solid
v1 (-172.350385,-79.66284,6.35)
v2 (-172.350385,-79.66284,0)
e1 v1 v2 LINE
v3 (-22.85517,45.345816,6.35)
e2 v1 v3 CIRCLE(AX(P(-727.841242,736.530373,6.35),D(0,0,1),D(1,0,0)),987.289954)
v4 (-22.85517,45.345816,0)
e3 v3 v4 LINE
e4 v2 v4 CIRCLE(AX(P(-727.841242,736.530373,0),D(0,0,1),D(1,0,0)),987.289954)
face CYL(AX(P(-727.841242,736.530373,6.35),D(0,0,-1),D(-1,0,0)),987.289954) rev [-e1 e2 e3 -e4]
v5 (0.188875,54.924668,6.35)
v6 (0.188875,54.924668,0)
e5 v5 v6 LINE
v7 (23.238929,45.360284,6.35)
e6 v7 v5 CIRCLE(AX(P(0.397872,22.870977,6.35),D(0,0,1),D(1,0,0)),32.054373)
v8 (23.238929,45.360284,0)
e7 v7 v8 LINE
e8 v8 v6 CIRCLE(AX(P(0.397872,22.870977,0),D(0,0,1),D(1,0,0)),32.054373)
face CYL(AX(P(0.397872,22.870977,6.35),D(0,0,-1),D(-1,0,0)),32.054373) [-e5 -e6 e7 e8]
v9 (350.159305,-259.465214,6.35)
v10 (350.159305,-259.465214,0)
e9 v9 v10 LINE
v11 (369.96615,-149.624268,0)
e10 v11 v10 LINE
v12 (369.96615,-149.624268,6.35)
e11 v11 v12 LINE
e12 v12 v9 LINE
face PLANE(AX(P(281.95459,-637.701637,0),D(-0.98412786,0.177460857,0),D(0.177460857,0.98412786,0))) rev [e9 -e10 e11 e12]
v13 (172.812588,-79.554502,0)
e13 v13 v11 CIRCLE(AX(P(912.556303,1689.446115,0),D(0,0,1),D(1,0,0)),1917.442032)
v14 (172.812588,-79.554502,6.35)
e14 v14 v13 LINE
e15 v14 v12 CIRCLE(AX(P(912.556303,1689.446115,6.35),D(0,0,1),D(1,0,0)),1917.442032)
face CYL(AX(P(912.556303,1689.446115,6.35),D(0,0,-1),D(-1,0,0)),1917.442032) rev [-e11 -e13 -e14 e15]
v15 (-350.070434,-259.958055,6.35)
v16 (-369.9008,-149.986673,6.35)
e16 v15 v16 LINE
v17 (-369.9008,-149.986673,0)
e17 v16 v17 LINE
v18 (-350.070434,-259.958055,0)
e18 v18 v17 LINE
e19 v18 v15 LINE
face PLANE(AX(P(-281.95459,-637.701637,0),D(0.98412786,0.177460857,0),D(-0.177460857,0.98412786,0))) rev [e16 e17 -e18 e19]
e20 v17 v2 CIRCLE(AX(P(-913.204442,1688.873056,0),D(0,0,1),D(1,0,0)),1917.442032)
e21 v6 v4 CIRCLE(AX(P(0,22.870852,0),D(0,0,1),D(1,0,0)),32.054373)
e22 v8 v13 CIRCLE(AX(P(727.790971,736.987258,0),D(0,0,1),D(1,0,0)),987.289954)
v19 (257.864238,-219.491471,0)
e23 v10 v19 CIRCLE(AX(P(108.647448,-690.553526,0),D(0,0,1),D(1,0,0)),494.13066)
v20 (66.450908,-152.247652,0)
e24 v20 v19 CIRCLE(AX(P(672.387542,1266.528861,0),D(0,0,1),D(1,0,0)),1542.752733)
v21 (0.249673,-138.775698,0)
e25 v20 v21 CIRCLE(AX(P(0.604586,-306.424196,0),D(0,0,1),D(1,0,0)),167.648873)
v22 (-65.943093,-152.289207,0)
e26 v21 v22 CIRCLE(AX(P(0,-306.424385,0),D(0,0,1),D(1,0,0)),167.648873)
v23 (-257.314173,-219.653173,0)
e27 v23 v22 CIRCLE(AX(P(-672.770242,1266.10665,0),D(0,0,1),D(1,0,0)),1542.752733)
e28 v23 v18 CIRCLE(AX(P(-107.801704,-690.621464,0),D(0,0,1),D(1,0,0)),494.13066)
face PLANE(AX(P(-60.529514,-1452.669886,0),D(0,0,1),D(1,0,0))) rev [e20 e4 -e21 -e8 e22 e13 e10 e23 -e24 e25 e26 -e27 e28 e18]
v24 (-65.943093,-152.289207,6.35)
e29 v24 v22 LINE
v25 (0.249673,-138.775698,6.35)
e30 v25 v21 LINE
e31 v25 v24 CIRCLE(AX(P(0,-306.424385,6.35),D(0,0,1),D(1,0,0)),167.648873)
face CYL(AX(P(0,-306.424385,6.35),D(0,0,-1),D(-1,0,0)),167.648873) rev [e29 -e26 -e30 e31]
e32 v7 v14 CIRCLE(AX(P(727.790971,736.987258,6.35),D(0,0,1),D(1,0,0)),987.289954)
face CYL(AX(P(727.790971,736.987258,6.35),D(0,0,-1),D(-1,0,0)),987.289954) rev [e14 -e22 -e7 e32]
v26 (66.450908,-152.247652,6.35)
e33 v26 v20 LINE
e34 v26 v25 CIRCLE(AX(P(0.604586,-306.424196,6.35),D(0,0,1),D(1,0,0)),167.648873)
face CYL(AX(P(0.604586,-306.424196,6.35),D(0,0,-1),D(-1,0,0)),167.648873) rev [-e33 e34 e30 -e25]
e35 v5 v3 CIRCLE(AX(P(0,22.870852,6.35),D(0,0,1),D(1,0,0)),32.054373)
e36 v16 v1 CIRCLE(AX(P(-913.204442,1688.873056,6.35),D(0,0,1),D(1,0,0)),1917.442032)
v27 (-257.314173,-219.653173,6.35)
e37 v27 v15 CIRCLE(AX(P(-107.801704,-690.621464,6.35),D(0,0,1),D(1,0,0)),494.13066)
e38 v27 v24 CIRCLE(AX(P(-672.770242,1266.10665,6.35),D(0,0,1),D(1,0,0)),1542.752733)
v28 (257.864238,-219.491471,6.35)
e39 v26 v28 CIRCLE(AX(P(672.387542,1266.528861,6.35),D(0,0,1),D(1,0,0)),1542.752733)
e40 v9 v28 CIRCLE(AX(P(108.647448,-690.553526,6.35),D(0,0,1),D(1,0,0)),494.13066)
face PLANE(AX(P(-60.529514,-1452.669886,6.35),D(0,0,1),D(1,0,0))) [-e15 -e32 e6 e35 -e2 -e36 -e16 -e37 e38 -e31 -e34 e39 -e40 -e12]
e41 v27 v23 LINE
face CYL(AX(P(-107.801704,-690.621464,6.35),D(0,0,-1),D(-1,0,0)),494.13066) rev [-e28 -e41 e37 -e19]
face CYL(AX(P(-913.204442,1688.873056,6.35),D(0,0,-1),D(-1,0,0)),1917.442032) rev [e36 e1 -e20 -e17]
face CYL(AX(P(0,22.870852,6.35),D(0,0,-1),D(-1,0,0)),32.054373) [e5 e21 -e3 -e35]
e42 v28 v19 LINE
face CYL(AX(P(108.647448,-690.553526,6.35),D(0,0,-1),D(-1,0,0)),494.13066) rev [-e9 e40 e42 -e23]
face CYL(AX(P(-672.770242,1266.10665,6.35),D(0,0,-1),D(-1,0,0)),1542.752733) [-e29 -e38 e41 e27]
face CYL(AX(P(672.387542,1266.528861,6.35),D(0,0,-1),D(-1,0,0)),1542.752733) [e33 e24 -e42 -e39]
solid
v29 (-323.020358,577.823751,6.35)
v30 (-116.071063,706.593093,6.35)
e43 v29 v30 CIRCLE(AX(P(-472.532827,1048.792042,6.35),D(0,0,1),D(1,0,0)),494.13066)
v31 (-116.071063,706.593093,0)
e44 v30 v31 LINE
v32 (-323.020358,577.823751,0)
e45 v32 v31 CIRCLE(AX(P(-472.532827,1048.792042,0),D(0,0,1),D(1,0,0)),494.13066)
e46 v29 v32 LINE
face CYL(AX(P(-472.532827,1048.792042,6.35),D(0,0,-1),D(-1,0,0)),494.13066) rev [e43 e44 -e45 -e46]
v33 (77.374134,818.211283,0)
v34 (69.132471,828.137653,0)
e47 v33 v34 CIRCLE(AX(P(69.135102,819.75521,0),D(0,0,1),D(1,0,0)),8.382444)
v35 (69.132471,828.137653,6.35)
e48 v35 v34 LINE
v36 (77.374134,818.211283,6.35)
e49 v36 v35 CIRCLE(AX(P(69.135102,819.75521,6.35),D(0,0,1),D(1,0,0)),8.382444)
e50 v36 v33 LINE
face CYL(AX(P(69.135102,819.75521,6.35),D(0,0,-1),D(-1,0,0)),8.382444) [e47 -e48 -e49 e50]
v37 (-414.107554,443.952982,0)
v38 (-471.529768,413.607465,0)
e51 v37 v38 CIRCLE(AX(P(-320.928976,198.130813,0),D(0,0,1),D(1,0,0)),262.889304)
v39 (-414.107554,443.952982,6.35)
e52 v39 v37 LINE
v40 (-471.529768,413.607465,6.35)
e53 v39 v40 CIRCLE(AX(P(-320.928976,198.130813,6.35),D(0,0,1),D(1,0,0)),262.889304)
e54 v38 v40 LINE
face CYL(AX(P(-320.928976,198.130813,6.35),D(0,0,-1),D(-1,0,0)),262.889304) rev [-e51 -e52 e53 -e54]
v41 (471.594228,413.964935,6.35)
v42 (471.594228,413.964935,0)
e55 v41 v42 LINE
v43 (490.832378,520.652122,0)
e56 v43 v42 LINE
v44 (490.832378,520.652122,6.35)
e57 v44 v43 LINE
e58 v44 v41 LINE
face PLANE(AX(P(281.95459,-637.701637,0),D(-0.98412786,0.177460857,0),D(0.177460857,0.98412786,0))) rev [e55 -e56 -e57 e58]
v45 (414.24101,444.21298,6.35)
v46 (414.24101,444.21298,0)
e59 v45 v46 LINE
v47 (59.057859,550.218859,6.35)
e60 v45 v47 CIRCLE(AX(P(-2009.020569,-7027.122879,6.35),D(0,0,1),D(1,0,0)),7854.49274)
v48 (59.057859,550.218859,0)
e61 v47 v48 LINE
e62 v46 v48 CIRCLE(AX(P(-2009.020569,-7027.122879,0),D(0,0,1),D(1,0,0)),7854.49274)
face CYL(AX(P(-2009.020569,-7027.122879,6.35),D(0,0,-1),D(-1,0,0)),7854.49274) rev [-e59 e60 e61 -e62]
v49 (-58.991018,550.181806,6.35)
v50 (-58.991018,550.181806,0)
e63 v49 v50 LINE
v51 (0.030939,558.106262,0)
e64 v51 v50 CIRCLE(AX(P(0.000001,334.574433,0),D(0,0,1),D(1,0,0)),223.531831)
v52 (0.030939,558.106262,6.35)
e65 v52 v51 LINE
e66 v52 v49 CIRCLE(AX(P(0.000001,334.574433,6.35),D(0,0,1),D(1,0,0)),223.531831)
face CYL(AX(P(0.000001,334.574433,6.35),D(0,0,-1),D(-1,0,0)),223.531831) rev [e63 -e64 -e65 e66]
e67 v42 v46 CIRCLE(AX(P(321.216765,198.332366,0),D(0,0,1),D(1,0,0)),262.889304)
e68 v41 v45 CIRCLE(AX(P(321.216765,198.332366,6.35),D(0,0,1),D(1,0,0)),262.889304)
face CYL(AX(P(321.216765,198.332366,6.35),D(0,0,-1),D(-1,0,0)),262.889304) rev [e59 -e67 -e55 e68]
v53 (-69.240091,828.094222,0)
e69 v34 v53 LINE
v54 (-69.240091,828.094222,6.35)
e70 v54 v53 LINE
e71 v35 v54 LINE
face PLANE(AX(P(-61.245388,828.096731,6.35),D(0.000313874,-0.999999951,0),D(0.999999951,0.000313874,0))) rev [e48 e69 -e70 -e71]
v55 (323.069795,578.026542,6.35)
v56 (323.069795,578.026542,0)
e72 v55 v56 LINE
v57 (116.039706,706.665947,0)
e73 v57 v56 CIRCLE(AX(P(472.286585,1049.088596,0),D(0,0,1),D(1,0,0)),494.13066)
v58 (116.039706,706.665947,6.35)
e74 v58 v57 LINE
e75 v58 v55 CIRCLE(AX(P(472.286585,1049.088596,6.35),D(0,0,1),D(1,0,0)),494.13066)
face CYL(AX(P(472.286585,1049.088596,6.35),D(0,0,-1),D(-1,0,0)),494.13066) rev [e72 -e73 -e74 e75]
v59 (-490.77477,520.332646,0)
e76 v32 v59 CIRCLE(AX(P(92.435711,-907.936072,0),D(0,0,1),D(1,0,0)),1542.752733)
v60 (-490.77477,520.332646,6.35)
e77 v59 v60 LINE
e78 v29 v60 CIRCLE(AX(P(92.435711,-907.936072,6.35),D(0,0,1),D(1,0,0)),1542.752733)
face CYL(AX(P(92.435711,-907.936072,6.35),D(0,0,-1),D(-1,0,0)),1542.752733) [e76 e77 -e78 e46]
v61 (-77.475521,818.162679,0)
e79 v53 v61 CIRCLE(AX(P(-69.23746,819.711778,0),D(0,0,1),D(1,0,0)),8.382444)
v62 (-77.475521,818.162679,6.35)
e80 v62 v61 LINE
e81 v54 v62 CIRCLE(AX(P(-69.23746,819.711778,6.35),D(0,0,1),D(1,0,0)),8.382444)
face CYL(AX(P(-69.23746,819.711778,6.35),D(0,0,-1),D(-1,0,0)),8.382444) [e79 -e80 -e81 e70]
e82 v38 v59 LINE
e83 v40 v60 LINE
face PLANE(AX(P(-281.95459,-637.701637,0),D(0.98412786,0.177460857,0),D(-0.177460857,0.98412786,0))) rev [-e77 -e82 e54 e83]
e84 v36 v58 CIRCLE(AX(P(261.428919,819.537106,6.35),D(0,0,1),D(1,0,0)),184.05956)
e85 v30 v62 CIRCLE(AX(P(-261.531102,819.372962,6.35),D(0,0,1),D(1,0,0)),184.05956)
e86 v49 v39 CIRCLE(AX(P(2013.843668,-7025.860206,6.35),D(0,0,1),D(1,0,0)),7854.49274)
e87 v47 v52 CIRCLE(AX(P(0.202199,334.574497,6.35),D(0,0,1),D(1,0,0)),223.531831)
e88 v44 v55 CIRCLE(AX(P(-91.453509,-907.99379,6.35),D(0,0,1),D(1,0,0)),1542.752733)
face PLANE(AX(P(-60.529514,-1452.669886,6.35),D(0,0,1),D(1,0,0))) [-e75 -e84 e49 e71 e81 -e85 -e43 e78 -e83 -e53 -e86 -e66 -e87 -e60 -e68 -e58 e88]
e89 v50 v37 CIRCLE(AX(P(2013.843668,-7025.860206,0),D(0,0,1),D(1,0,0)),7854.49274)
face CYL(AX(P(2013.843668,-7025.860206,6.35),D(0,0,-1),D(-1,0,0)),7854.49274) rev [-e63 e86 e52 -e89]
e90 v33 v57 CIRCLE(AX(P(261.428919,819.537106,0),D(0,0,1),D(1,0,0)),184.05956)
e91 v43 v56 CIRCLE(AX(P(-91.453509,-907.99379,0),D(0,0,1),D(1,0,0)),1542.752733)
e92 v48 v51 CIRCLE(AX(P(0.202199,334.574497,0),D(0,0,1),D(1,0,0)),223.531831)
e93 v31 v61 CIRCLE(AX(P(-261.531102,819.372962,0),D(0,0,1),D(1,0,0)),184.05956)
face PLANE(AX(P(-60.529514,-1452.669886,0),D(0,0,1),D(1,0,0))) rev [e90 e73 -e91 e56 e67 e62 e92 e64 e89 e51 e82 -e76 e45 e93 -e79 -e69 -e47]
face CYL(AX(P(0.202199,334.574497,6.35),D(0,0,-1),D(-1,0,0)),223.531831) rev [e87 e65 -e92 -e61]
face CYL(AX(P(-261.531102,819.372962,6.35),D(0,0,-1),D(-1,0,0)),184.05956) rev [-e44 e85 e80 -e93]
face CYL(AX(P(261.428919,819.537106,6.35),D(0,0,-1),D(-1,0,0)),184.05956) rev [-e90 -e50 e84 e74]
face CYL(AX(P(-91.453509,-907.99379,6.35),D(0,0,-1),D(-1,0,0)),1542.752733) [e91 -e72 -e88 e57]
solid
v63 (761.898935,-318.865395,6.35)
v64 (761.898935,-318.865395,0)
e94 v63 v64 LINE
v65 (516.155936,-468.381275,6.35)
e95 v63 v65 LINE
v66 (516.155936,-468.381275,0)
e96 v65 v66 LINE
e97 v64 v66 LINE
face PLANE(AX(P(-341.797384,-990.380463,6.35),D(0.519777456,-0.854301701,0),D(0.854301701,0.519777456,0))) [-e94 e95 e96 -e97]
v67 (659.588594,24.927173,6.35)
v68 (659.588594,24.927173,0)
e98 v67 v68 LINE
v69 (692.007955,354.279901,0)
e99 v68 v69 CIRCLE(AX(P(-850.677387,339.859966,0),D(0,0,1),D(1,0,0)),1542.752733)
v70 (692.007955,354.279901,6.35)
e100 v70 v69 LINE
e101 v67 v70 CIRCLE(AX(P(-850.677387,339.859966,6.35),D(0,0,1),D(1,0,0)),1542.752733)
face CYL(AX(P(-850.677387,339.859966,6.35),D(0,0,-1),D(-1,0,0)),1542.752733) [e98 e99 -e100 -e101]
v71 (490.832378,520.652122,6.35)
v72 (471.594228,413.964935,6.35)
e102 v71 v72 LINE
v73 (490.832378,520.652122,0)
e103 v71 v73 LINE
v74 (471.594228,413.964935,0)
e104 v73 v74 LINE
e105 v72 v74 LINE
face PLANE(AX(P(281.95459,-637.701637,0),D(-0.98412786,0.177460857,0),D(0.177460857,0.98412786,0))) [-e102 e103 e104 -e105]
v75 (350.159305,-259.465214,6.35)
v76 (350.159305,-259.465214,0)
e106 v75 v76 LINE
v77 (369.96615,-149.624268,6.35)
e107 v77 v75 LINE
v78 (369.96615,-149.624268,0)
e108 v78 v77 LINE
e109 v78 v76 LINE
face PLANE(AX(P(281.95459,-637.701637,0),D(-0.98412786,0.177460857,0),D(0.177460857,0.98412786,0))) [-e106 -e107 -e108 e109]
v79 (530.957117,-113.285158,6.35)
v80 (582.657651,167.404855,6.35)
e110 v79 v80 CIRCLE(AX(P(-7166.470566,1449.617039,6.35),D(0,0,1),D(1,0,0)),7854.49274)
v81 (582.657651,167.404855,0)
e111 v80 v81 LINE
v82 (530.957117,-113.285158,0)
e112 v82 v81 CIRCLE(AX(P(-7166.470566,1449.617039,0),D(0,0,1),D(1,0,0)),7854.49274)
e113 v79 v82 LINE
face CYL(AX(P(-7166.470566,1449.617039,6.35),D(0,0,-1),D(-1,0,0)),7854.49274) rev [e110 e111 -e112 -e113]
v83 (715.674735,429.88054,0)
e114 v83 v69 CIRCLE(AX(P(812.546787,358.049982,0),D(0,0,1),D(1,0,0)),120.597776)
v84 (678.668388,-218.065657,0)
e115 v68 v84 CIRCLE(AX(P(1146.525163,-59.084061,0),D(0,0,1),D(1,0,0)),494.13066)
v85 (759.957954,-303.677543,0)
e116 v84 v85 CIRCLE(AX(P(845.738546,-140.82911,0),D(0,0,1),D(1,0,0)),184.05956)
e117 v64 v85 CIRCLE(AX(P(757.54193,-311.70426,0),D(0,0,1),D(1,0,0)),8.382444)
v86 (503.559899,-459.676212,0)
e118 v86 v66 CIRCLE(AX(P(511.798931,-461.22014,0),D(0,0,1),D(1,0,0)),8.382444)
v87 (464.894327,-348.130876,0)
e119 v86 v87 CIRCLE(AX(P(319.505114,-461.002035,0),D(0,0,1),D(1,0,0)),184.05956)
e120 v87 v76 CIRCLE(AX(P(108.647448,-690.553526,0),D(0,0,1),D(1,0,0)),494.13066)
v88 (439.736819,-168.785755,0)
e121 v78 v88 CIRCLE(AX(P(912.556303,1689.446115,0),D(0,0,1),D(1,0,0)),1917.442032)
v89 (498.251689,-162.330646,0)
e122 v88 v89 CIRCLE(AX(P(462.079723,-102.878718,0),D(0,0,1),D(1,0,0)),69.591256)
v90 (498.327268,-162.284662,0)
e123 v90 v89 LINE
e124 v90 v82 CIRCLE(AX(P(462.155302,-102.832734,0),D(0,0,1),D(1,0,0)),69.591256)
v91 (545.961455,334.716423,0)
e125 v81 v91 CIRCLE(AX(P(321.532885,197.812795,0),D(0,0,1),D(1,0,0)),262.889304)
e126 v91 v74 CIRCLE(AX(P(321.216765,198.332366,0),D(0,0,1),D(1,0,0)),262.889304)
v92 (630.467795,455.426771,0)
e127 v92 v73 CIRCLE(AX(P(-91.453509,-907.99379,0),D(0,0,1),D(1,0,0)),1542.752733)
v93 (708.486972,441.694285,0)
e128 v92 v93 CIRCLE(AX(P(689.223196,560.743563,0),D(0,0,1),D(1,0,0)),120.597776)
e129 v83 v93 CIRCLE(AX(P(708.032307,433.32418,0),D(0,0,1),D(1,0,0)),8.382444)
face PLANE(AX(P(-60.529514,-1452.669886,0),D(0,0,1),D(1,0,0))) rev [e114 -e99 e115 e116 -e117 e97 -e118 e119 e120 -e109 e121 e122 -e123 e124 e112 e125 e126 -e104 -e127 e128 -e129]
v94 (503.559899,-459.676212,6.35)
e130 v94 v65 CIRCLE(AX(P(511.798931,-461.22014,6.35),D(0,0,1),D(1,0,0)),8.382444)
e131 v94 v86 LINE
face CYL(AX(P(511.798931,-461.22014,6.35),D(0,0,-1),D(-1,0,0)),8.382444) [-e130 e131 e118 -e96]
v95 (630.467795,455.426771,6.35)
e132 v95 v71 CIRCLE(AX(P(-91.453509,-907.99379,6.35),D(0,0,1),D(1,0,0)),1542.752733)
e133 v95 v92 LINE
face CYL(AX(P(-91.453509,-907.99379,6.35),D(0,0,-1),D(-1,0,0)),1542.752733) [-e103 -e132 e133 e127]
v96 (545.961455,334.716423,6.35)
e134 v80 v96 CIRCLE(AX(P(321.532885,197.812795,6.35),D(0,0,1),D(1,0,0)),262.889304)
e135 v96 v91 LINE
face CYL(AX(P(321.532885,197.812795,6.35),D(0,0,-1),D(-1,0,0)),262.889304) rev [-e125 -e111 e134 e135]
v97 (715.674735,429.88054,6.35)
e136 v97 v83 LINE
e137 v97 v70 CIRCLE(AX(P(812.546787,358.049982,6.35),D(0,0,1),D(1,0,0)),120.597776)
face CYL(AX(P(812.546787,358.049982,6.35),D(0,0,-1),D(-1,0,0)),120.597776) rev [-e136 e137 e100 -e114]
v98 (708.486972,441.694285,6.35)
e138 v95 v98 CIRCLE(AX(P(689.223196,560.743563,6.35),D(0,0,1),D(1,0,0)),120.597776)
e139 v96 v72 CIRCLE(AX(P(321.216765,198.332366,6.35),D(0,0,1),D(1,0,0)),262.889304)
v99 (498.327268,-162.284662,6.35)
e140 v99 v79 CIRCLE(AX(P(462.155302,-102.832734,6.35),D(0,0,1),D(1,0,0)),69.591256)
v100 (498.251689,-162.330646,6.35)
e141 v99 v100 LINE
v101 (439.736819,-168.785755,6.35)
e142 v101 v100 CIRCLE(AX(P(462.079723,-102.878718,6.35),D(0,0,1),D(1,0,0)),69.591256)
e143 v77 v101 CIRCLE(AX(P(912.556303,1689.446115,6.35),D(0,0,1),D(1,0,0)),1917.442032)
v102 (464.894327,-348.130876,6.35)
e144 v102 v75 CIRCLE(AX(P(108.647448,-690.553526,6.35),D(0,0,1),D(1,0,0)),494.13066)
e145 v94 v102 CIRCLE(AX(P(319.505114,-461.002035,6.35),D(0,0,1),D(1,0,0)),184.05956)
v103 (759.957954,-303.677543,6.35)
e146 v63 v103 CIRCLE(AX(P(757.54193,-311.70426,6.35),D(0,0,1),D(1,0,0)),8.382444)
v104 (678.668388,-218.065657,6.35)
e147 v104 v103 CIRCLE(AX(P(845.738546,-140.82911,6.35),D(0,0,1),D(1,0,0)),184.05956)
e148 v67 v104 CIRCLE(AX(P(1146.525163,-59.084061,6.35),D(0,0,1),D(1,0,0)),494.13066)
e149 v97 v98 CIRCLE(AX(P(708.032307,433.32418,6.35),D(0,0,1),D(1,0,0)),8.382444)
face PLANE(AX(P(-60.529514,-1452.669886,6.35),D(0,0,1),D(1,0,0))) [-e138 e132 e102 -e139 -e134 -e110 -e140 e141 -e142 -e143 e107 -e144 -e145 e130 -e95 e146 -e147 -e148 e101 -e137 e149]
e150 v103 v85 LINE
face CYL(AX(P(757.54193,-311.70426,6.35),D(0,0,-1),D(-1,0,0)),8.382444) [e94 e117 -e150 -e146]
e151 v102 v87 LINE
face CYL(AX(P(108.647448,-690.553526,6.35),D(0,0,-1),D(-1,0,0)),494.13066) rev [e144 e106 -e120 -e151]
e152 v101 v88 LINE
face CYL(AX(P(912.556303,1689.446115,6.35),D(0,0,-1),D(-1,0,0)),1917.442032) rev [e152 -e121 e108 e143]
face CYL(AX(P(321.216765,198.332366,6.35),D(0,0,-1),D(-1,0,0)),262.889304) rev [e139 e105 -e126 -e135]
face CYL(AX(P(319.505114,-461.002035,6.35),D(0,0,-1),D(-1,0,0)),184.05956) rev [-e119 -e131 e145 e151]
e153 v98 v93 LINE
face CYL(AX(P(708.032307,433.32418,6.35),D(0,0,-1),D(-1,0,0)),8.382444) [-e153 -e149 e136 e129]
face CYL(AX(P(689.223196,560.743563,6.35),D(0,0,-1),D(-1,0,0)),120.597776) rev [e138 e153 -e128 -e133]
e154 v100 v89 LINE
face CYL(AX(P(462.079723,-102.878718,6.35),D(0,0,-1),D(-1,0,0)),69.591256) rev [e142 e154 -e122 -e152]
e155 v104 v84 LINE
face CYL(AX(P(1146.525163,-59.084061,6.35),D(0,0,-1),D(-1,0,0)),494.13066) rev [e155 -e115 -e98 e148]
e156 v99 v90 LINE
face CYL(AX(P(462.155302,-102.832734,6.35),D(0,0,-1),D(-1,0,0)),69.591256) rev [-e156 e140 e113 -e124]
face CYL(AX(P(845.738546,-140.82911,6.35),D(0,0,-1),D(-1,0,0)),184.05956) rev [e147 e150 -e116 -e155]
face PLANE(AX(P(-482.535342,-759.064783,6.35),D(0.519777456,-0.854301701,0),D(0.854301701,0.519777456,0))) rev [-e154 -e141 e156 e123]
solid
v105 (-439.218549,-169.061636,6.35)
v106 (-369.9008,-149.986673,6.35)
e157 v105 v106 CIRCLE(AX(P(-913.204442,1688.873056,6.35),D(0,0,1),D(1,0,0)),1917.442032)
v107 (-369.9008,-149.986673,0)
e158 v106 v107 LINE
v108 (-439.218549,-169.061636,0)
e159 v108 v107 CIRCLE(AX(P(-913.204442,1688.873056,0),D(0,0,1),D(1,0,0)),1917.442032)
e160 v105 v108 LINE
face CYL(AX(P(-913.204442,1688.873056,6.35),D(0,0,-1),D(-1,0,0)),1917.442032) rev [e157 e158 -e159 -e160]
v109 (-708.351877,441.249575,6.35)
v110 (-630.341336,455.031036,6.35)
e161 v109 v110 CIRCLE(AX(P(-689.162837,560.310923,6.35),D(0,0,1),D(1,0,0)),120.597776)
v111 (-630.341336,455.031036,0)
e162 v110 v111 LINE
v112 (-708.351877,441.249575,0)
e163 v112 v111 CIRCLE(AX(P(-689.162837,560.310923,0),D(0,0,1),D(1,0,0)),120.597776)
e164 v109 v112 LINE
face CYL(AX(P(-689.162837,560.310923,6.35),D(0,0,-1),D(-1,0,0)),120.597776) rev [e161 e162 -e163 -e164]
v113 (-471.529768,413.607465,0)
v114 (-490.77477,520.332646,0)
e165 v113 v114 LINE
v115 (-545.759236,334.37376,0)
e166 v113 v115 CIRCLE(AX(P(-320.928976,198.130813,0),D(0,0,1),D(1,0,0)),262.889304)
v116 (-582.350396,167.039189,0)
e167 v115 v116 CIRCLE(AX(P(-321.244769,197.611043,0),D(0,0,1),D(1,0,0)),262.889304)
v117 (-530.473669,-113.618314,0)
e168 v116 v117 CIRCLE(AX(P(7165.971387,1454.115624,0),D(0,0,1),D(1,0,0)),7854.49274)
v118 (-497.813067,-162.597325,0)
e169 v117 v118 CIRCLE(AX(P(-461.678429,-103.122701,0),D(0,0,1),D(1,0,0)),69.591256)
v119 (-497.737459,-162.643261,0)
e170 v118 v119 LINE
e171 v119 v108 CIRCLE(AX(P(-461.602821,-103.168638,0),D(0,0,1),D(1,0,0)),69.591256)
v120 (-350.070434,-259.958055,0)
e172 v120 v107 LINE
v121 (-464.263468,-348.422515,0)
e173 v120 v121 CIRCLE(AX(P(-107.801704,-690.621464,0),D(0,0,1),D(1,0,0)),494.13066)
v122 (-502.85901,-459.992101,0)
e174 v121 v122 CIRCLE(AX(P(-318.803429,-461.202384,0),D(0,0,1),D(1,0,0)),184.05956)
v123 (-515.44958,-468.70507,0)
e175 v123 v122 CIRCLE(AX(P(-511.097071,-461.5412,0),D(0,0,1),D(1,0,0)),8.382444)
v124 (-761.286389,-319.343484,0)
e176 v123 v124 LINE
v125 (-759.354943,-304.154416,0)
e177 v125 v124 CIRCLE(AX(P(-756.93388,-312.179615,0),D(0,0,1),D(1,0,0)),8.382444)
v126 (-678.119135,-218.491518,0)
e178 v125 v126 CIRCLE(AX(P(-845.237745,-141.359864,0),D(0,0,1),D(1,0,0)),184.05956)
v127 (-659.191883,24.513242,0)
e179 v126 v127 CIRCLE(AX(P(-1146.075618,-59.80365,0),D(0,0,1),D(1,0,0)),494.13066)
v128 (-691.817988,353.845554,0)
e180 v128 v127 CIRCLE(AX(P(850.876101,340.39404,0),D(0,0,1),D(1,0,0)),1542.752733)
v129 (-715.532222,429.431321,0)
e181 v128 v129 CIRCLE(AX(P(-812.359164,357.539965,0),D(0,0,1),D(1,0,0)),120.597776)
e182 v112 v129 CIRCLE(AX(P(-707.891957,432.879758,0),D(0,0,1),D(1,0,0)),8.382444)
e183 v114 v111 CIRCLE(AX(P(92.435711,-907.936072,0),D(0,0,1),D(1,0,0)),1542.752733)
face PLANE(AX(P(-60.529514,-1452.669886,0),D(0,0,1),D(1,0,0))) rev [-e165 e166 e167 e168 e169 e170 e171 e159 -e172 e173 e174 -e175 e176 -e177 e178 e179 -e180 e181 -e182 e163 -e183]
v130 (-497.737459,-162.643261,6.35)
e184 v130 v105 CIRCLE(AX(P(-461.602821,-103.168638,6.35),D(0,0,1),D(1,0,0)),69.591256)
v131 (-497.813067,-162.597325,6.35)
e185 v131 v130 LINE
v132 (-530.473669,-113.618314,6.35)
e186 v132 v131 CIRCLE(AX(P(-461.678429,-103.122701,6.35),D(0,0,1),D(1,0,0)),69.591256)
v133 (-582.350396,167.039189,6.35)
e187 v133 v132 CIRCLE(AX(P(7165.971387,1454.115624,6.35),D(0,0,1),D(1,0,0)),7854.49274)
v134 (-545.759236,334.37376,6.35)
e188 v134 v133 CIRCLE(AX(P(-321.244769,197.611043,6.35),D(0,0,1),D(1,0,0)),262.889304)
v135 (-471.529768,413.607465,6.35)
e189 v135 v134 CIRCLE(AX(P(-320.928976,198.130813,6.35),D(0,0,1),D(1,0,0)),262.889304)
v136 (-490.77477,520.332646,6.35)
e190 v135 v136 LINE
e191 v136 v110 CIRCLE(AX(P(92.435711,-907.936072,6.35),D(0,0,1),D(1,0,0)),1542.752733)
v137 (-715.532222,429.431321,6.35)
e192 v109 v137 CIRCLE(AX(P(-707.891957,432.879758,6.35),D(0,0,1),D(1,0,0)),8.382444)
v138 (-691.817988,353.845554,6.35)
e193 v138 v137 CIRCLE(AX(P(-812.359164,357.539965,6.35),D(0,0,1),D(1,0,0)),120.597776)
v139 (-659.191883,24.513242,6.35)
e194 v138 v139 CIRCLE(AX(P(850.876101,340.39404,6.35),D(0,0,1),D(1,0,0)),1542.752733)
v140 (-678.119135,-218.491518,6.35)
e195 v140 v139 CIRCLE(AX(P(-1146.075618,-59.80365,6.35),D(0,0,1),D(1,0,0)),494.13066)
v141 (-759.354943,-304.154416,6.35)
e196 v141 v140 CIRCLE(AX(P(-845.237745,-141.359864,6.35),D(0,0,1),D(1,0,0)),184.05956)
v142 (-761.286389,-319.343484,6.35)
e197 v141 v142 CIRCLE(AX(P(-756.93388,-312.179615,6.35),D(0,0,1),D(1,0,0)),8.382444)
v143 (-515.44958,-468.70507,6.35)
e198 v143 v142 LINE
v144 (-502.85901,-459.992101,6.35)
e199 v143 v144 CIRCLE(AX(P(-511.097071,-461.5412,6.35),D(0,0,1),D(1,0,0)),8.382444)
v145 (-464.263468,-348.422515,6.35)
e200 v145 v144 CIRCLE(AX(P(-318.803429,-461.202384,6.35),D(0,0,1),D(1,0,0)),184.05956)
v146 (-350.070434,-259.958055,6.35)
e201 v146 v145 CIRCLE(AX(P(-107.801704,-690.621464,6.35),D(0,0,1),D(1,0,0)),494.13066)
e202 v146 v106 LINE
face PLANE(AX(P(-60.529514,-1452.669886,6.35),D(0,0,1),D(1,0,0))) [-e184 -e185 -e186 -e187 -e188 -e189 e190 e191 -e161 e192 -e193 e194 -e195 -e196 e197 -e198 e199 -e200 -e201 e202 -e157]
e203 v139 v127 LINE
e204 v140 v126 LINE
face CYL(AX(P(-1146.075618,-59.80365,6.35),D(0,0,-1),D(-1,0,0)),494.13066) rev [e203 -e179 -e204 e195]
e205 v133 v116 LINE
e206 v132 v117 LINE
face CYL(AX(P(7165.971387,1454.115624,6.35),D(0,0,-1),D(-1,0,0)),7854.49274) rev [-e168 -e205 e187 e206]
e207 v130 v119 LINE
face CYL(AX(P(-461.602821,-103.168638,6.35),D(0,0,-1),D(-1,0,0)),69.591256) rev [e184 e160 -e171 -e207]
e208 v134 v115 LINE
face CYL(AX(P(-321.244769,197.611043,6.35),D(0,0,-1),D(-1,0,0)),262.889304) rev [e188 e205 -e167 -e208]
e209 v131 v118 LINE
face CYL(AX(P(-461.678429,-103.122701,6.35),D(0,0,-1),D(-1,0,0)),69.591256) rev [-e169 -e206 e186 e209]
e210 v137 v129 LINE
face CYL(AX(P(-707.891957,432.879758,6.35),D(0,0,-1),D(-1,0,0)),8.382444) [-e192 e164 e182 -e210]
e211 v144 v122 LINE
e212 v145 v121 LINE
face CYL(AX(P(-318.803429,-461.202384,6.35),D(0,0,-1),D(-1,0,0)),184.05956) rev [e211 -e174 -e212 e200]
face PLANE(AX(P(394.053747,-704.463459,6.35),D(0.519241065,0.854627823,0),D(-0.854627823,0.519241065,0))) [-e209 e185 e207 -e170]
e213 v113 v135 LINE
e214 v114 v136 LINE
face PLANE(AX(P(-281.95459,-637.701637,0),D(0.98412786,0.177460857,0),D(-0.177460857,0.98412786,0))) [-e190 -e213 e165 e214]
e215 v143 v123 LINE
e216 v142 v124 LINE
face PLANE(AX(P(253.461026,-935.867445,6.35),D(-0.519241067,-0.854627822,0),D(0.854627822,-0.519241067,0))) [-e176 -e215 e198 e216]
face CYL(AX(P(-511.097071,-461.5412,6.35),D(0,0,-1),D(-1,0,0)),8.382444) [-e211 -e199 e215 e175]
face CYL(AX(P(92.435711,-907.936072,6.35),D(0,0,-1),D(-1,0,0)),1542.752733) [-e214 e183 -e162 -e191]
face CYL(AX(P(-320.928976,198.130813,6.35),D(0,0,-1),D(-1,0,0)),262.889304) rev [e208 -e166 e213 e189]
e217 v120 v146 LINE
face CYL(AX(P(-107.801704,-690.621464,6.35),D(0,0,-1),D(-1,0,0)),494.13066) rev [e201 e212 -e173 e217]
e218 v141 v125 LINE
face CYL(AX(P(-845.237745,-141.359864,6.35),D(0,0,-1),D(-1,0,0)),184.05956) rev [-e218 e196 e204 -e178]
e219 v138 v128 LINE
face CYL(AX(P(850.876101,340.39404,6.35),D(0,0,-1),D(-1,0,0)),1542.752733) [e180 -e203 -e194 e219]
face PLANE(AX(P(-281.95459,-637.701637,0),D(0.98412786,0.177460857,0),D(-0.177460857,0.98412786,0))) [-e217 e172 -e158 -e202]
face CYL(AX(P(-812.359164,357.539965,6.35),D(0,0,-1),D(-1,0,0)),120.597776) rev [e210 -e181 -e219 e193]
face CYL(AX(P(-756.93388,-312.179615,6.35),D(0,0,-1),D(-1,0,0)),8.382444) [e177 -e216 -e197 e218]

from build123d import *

# Parameters (mm, degrees)
BOSS_EXTRUDE1_DEPTH = 6.35
SPLIT1_DEPTH        = 6.35
SPLIT1_2_DEPTH      = 6.35
SPLIT1_3_DEPTH      = 6.35
SPLIT1_START        = -781.857853319
SPLIT1_4_OUTLINE_W  = 1287
SPLIT1_4_OUTLINE_H  = 6.35
SPLIT1_4_DEPTH      = 1172.504299698
SPLIT1_5_DEPTH      = 6.35


# Read off the part's stored shape, not the designer's step: Split1
with BuildPart() as part:
    # Model → Boss-Extrude1 (new body)
    with BuildSketch(Plane.XY):
        with BuildLine():
            Line((-638.367984426, -394.024277033), (-761.286388803, -319.34348417))
            ThreePointArc((-761.286388803, -319.34348417), (-765.249363496, -311.122215453), (-759.354942783, -304.154415787))
            ThreePointArc((-759.354942783, -304.154415787), (-711.682656668, -268.012776159), (-678.11913533, -218.491517958))
            ThreePointArc((-678.11913533, -218.491517958), (-653.437019788, -98.174481805), (-659.191883423, 24.513241952))
            ThreePointArc((-659.191883423, 24.513241952), (-684.361343993, 188.302016317), (-691.817988241, 353.845553823))
            ThreePointArc((-691.817988241, 353.845553823), (-697.291676319, 393.64117056), (-715.532221879, 429.431321025))
            ThreePointArc((-715.532221879, 429.431321025), (-716.258813808, 433.39071274), (-715.055826906, 437.232267256))
            ThreePointArc((-715.055826906, 437.232267256), (-712.200696082, 440.070038663), (-708.351876516, 441.249575239))
            ThreePointArc((-708.351876516, 441.249575239), (-668.182723515, 441.552097781), (-630.341335993, 455.031035538))
            ThreePointArc((-630.341335993, 455.031035538), (-479.982990088, 524.691872238), (-323.020358084, 577.823750686))
            ThreePointArc((-323.020358084, 577.823750686), (-230.775363979, 617.841419704), (-148.541225202, 675.704181397))
            ThreePointArc((-148.541225202, 675.704181397), (-131.955777097, 690.780334317), (-116.071063152, 706.593093045))
            ThreePointArc((-116.071063152, 706.593093045), (-87.585480923, 759.199524054), (-77.475520929, 818.162679392))
            ThreePointArc((-77.475520929, 818.162679392), (-75.690066507, 825.062407002), (-69.240090661, 828.09422167))
            Line((-69.240090661, 828.09422167), (-0.053809914, 828.115937465))
            Line((-0.053809914, 828.115937465), (69.132470832, 828.13765326))
            ThreePointArc((69.132470832, 828.13765326), (75.584348625, 825.109888153), (77.374133989, 818.211282718))
            ThreePointArc((77.374133989, 818.211282718), (87.521106024, 759.254485511), (116.039706251, 706.665946649))
            ThreePointArc((116.039706251, 706.665946649), (131.934343502, 690.863162642), (148.529252371, 675.797424183))
            ThreePointArc((148.529252371, 675.797424183), (230.799698209, 617.986296251), (323.069795171, 578.026541777))
            ThreePointArc((323.069795171, 578.026541777), (480.065749707, 524.993206857), (630.467795476, 455.426771113))
            ThreePointArc((630.467795476, 455.426771113), (668.317636924, 441.971590887), (708.486971917, 441.694284532))
            ThreePointArc((708.486971917, 441.694284532), (712.336531177, 440.517164279), (715.193442845, 437.681185735))
            ThreePointArc((715.193442845, 437.681185735), (716.39884104, 433.84038715), (715.674734757, 429.880540098))
            ThreePointArc((715.674734757, 429.880540098), (697.456660005, 394.078946209), (692.007954645, 354.279901214))
            ThreePointArc((692.007954645, 354.279901214), (684.655231578, 188.731715428), (659.588594129, 24.927173243))
            ThreePointArc((659.588594129, 24.927173243), (653.910748666, -97.764138948), (678.668388186, -218.065657232))
            ThreePointArc((678.668388186, -218.065657232), (712.262989808, -267.565836225), (759.957954391, -303.677542524))
            ThreePointArc((759.957954391, -303.677542524), (765.856747968, -310.641640604), (761.898934945, -318.865395452))
            Line((761.898934945, -318.865395452), (639.027435546, -393.623335448))
            Line((639.027435546, -393.623335448), (516.155936146, -468.381275443))
            ThreePointArc((516.155936146, -468.381275443), (507.033213291, -468.116029452), (503.559898784, -459.67621227))
            ThreePointArc((503.559898784, -459.67621227), (493.412926748, -400.719415063), (464.894326522, -348.130876201))
            ThreePointArc((464.894326522, -348.130876201), (448.999689271, -332.328092194), (432.404780401, -317.262353736))
            ThreePointArc((432.404780401, -317.262353736), (350.134334566, -259.451225805), (257.864237607, -219.491471331))
            ThreePointArc((257.864237607, -219.491471331), (161.051005017, -189.019470039), (66.450908428, -152.247652124))
            ThreePointArc((66.450908428, -152.247652124), (34.035926816, -142.142455336), (0.249672515, -138.775697944))
            ThreePointArc((0.249672515, -138.775697944), (-33.534461653, -142.163663944), (-65.943093355, -152.289207198))
            ThreePointArc((-65.943093355, -152.289207198), (-160.520087849, -189.120402938), (-257.314172608, -219.65317259))
            ThreePointArc((-257.314172608, -219.65317259), (-349.559166711, -259.670841607), (-431.793305487, -317.533603299))
            ThreePointArc((-431.793305487, -317.533603299), (-448.378753592, -332.609756219), (-464.263467537, -348.422514947))
            ThreePointArc((-464.263467537, -348.422514947), (-492.749049766, -401.028945956), (-502.85900976, -459.992101294))
            ThreePointArc((-502.85900976, -459.992101294), (-506.3270255, -468.434097181), (-515.44958005, -468.705069896))
            Line((-515.44958005, -468.705069896), (-638.367984426, -394.024277033))
        make_face()
        with BuildLine():
            Line((498.327267896, -162.284661886), (498.251688628, -162.330646108))
            ThreePointArc((498.251688628, -162.330646108), (483.560543344, -169.071747961), (467.710528036, -172.24179822))
            ThreePointArc((467.710528036, -172.24179822), (453.546867564, -171.944869226), (439.736818999, -168.78575489))
            ThreePointArc((439.736818999, -168.78575489), (304.635311179, -129.074166548), (172.812587553, -79.55450177))
            ThreePointArc((172.812587553, -79.55450177), (94.93620934, -20.796551659), (23.238928571, 45.360284081))
            ThreePointArc((23.238928571, 45.360284081), (12.682899079, 52.47774836), (0.188874949, 54.924668346))
            ThreePointArc((0.188874949, 54.924668346), (-12.303610669, 52.469905737), (-22.855170103, 45.345816329))
            ThreePointArc((-22.855170103, 45.345816329), (-94.510906889, -20.856014238), (-172.35038454, -79.662839553))
            ThreePointArc((-172.35038454, -79.662839553), (-304.141996297, -129.265246094), (-439.218548607, -169.061636385))
            ThreePointArc((-439.218548607, -169.061636385), (-453.026611322, -172.229419336), (-467.190082606, -172.535239489))
            ThreePointArc((-467.190082606, -172.535239489), (-483.042084786, -169.375139678), (-497.737458891, -162.643261498))
            Line((-497.737458891, -162.643261498), (-497.813067011, -162.59732473))
            ThreePointArc((-497.813067011, -162.59732473), (-519.577528179, -141.73147249), (-530.473668716, -113.618313986))
            ThreePointArc((-530.473668716, -113.618313986), (-557.686932125, 26.474784935), (-582.350395553, 167.03918883))
            ThreePointArc((-582.350395553, 167.03918883), (-578.065588789, 253.770219076), (-545.759236039, 334.373759622))
            ThreePointArc((-545.759236039, 334.373759622), (-489.108364583, 400.186447909), (-414.107553732, 443.952982479))
            ThreePointArc((-414.107553732, 443.952982479), (-237.176009353, 499.162492838), (-58.991018122, 550.181806148))
            ThreePointArc((-58.991018122, 550.181806148), (-29.745116882, 556.118351155), (0.030939182, 558.106262423))
            ThreePointArc((0.030939182, 558.106262423), (29.808237287, 556.137043422), (59.057859422, 550.218858656))
            ThreePointArc((59.057859422, 550.218858656), (237.274842843, 499.311410764), (414.241010049, 444.2129798))
            ThreePointArc((414.241010049, 444.2129798), (489.2692805, 400.493535502), (545.961454613, 334.716422682))
            ThreePointArc((545.961454613, 334.716422682), (578.318399751, 254.133178284), (582.657650946, 167.404854908))
            ThreePointArc((582.657650946, 167.404854908), (558.082431475, 26.824996256), (530.957116664, -113.285158148))
            ThreePointArc((530.957116664, -113.285158148), (520.078626268, -141.405151149), (498.327267896, -162.284661886))
        make_face(mode=Mode.SUBTRACT)
    extrude(amount=BOSS_EXTRUDE1_DEPTH)

    # Split1 4 outline → Split1 4 (cut)
    with BuildSketch(Plane(origin=(0, 0, 0), x_dir=(0.17746085670516612, 0.9841278597506874, 0), z_dir=(0.9841278597506874, -0.1774608567051661, 0)).offset(SPLIT1_START)):
        with Locations((121.5, 3.175)):
            Rectangle(SPLIT1_4_OUTLINE_W, SPLIT1_4_OUTLINE_H)
    extrude(amount=SPLIT1_4_DEPTH, mode=Mode.SUBTRACT)

    # Split1 5 outline → Split1 5 (cut)
    with BuildSketch(Plane.XY):
        with BuildLine():
            ThreePointArc((-65.943093355, -152.289207198), (-33.534461652, -142.163663944), (0.249672515, -138.775697944))
            ThreePointArc((0.249672515, -138.775697944), (34.035926816, -142.142455336), (66.450908428, -152.247652124))
            ThreePointArc((66.450908428, -152.247652124), (161.051005017, -189.019470039), (257.864237607, -219.491471331))
            ThreePointArc((257.864237607, -219.491471331), (305.031494723, -237.123910925), (350.159304792, -259.465214113))
            Line((350.159304792, -259.465214113), (369.966150257, -149.62426779))
            ThreePointArc((369.966150257, -149.62426779), (270.432887756, -117.280612064), (172.812587553, -79.55450177))
            ThreePointArc((172.812587553, -79.55450177), (94.93620934, -20.796551659), (23.238928571, 45.360284081))
            ThreePointArc((23.238928571, 45.360284081), (12.682899079, 52.47774836), (0.188874949, 54.924668346))
            ThreePointArc((0.188874949, 54.924668346), (-12.303610669, 52.469905737), (-22.855170103, 45.345816329))
            ThreePointArc((-22.855170103, 45.345816329), (-94.510906889, -20.856014238), (-172.35038454, -79.662839553))
            ThreePointArc((-172.35038454, -79.662839553), (-304.141996297, -129.265246094), (-439.218548607, -169.061636385))
            ThreePointArc((-439.218548607, -169.061636385), (-469.190114459, -172.345049244), (-497.737458891, -162.643261498))
            Line((-497.737458891, -162.643261498), (-497.813067011, -162.59732473))
            ThreePointArc((-497.813067011, -162.59732473), (-519.577528179, -141.73147249), (-530.473668716, -113.618313986))
            ThreePointArc((-530.473668716, -113.618313986), (-557.686932125, 26.474784935), (-582.350395553, 167.03918883))
            ThreePointArc((-582.350395553, 167.03918883), (-578.065588789, 253.770219076), (-545.759236039, 334.373759622))
            ThreePointArc((-545.759236039, 334.373759622), (-489.108364582, 400.18644791), (-414.107553732, 443.952982479))
            ThreePointArc((-414.107553732, 443.952982479), (-237.176009353, 499.162492838), (-58.991018122, 550.181806148))
            ThreePointArc((-58.991018122, 550.181806148), (-29.745116882, 556.118351155), (0.030939182, 558.106262423))
            ThreePointArc((0.030939182, 558.106262423), (29.808237287, 556.137043422), (59.057859422, 550.218858656))
            ThreePointArc((59.057859422, 550.218858656), (237.274842843, 499.311410764), (414.241010049, 444.2129798))
            ThreePointArc((414.241010049, 444.2129798), (443.853765702, 430.863982072), (471.59422819, 413.964935392))
            Line((471.59422819, 413.964935392), (490.832378328, 520.652121925))
            ThreePointArc((490.832378328, 520.652121925), (407.775994413, 551.751358688), (323.069795171, 578.026541777))
            ThreePointArc((323.069795171, 578.026541777), (211.498540436, 629.38071525), (116.039706251, 706.665946649))
            ThreePointArc((116.039706251, 706.665946649), (87.521106024, 759.25448551), (77.374133989, 818.211282718))
            ThreePointArc((77.374133989, 818.211282718), (75.584348625, 825.109888153), (69.132470832, 828.13765326))
            Line((69.132470832, 828.13765326), (-69.240090661, 828.09422167))
            ThreePointArc((-69.240090661, 828.09422167), (-75.690066507, 825.062407002), (-77.475520929, 818.162679392))
            ThreePointArc((-77.475520929, 818.162679392), (-87.585480923, 759.199524054), (-116.071063152, 706.593093045))
            ThreePointArc((-116.071063152, 706.593093045), (-211.481362839, 629.247952732), (-323.020358084, 577.823750686))
            ThreePointArc((-323.020358084, 577.823750686), (-479.982990088, 524.691872238), (-630.341335993, 455.031035538))
            ThreePointArc((-630.341335993, 455.031035538), (-668.182723515, 441.552097781), (-708.351876516, 441.249575239))
            ThreePointArc((-708.351876516, 441.249575239), (-715.055826906, 437.232267256), (-715.532221879, 429.431321025))
            ThreePointArc((-715.532221879, 429.431321025), (-697.291676319, 393.64117056), (-691.817988241, 353.845553823))
            ThreePointArc((-691.817988241, 353.845553823), (-684.361343993, 188.302016317), (-659.191883423, 24.513241952))
            ThreePointArc((-659.191883423, 24.513241952), (-653.437019788, -98.174481805), (-678.11913533, -218.491517958))
            ThreePointArc((-678.11913533, -218.491517958), (-711.682656668, -268.012776159), (-759.354942783, -304.154415787))
            ThreePointArc((-759.354942783, -304.154415787), (-765.249363496, -311.122215453), (-761.286388803, -319.34348417))
            Line((-761.286388803, -319.34348417), (-515.44958005, -468.705069896))
            ThreePointArc((-515.44958005, -468.705069896), (-506.3270255, -468.434097181), (-502.85900976, -459.992101294))
            ThreePointArc((-502.85900976, -459.992101294), (-492.749049766, -401.028945956), (-464.263467537, -348.422514947))
            ThreePointArc((-464.263467537, -348.422514947), (-368.853167852, -271.077374635), (-257.314172608, -219.65317259))
            ThreePointArc((-257.314172608, -219.65317259), (-160.520087849, -189.120402938), (-65.943093355, -152.289207198))
        make_face()
    extrude(amount=SPLIT1_5_DEPTH, mode=Mode.SUBTRACT)


with BuildPart() as body_2:
    # Split1 outline → Split1 (new body)
    with BuildSketch(Plane.XY):
        with BuildLine():
            ThreePointArc((-464.263467537, -348.422514947), (-410.417039433, -299.994956425), (-350.070434299, -259.958054786))
            Line((-350.070434299, -259.958054786), (-369.900800355, -149.98667255))
            ThreePointArc((-369.900800355, -149.98667255), (-404.470264766, -159.849066229), (-439.218548607, -169.061636385))
            ThreePointArc((-439.218548607, -169.061636385), (-469.190114459, -172.345049244), (-497.737458891, -162.643261498))
            Line((-497.737458891, -162.643261498), (-497.813067011, -162.59732473))
            ThreePointArc((-497.813067011, -162.59732473), (-519.577528179, -141.73147249), (-530.473668716, -113.618313986))
            ThreePointArc((-530.473668716, -113.618313986), (-557.686932125, 26.474784935), (-582.350395553, 167.03918883))
            ThreePointArc((-582.350395553, 167.03918883), (-578.065588789, 253.770219076), (-545.759236039, 334.373759622))
            ThreePointArc((-545.759236039, 334.373759622), (-512.779474489, 377.864428576), (-471.529768148, 413.607465447))
            Line((-471.529768148, 413.607465447), (-490.774769517, 520.332646195))
            ThreePointArc((-490.774769517, 520.332646195), (-561.373841233, 489.425393525), (-630.341335993, 455.031035538))
            ThreePointArc((-630.341335993, 455.031035538), (-668.182723515, 441.552097781), (-708.351876516, 441.249575239))
            ThreePointArc((-708.351876516, 441.249575239), (-715.055826906, 437.232267256), (-715.532221879, 429.431321025))
            ThreePointArc((-715.532221879, 429.431321025), (-697.291676319, 393.64117056), (-691.817988241, 353.845553823))
            ThreePointArc((-691.817988241, 353.845553823), (-684.361343993, 188.302016317), (-659.191883423, 24.513241952))
            ThreePointArc((-659.191883423, 24.513241952), (-653.437019788, -98.174481805), (-678.11913533, -218.491517958))
            ThreePointArc((-678.11913533, -218.491517958), (-711.682656668, -268.012776159), (-759.354942783, -304.154415787))
            ThreePointArc((-759.354942783, -304.154415787), (-765.249363496, -311.122215453), (-761.286388803, -319.34348417))
            Line((-761.286388803, -319.34348417), (-515.44958005, -468.705069896))
            ThreePointArc((-515.44958005, -468.705069896), (-506.3270255, -468.434097181), (-502.85900976, -459.992101294))
            ThreePointArc((-502.85900976, -459.992101294), (-492.749049766, -401.028945956), (-464.263467537, -348.422514947))
        make_face()
    extrude(amount=SPLIT1_DEPTH)


with BuildPart() as body_3:
    # Split1 2 outline → Split1 2 (new body)
    with BuildSketch(Plane.XY):
        with BuildLine():
            Line((-369.900800355, -149.98667255), (-350.070434299, -259.958054786))
            ThreePointArc((-350.070434299, -259.958054786), (-304.726176416, -237.426294216), (-257.314172608, -219.65317259))
            ThreePointArc((-257.314172608, -219.65317259), (-160.520087849, -189.120402938), (-65.943093355, -152.289207198))
            ThreePointArc((-65.943093355, -152.289207198), (-33.534461652, -142.163663944), (0.249672515, -138.775697944))
            ThreePointArc((0.249672515, -138.775697944), (34.035926816, -142.142455336), (66.450908428, -152.247652124))
            ThreePointArc((66.450908428, -152.247652124), (161.051005017, -189.019470039), (257.864237607, -219.491471331))
            ThreePointArc((257.864237607, -219.491471331), (305.031494723, -237.123910924), (350.159304792, -259.465214113))
            Line((350.159304792, -259.465214113), (369.966150257, -149.62426779))
            ThreePointArc((369.966150257, -149.62426779), (270.432887757, -117.280612064), (172.812587553, -79.55450177))
            ThreePointArc((172.812587553, -79.55450177), (94.93620934, -20.796551659), (23.238928571, 45.360284081))
            ThreePointArc((23.238928571, 45.360284081), (12.682899079, 52.47774836), (0.188874949, 54.924668346))
            ThreePointArc((0.188874949, 54.924668346), (-12.303610669, 52.469905737), (-22.855170103, 45.345816329))
            ThreePointArc((-22.855170103, 45.345816329), (-94.510906889, -20.856014238), (-172.35038454, -79.662839553))
            ThreePointArc((-172.35038454, -79.662839553), (-270.163533959, -117.52732567), (-369.900800355, -149.98667255))
        make_face()
    extrude(amount=SPLIT1_2_DEPTH)


with BuildPart() as body_4:
    # Split1 3 outline → Split1 3 (new body)
    with BuildSketch(Plane.XY):
        with BuildLine():
            Line((-490.774769517, 520.332646195), (-471.529768148, 413.607465447))
            ThreePointArc((-471.529768148, 413.607465447), (-443.759378978, 430.560325874), (-414.107553732, 443.952982479))
            ThreePointArc((-414.107553732, 443.952982479), (-237.176009353, 499.162492838), (-58.991018122, 550.181806148))
            ThreePointArc((-58.991018122, 550.181806148), (-29.745116882, 556.118351155), (0.030939182, 558.106262423))
            ThreePointArc((0.030939182, 558.106262423), (29.808237287, 556.137043422), (59.057859422, 550.218858656))
            ThreePointArc((59.057859422, 550.218858656), (237.274842843, 499.311410764), (414.241010049, 444.2129798))
            ThreePointArc((414.241010049, 444.2129798), (443.853765702, 430.863982071), (471.59422819, 413.964935392))
            Line((471.59422819, 413.964935392), (490.832378328, 520.652121925))
            ThreePointArc((490.832378328, 520.652121925), (407.775994413, 551.751358688), (323.069795171, 578.026541777))
            ThreePointArc((323.069795171, 578.026541777), (211.498540436, 629.38071525), (116.039706251, 706.665946649))
            ThreePointArc((116.039706251, 706.665946649), (87.521106024, 759.25448551), (77.374133989, 818.211282718))
            ThreePointArc((77.374133989, 818.211282718), (75.584348625, 825.109888153), (69.132470832, 828.13765326))
            Line((69.132470832, 828.13765326), (-69.240090661, 828.09422167))
            ThreePointArc((-69.240090661, 828.09422167), (-75.690066507, 825.062407002), (-77.475520929, 818.162679392))
            ThreePointArc((-77.475520929, 818.162679392), (-87.585480923, 759.199524054), (-116.071063152, 706.593093045))
            ThreePointArc((-116.071063152, 706.593093045), (-211.481362839, 629.247952732), (-323.020358084, 577.823750686))
            ThreePointArc((-323.020358084, 577.823750686), (-407.724289496, 551.49051742), (-490.774769517, 520.332646195))
        make_face()
    extrude(amount=SPLIT1_3_DEPTH)


solid = Compound([part.part, body_2.part, body_3.part, body_4.part])
